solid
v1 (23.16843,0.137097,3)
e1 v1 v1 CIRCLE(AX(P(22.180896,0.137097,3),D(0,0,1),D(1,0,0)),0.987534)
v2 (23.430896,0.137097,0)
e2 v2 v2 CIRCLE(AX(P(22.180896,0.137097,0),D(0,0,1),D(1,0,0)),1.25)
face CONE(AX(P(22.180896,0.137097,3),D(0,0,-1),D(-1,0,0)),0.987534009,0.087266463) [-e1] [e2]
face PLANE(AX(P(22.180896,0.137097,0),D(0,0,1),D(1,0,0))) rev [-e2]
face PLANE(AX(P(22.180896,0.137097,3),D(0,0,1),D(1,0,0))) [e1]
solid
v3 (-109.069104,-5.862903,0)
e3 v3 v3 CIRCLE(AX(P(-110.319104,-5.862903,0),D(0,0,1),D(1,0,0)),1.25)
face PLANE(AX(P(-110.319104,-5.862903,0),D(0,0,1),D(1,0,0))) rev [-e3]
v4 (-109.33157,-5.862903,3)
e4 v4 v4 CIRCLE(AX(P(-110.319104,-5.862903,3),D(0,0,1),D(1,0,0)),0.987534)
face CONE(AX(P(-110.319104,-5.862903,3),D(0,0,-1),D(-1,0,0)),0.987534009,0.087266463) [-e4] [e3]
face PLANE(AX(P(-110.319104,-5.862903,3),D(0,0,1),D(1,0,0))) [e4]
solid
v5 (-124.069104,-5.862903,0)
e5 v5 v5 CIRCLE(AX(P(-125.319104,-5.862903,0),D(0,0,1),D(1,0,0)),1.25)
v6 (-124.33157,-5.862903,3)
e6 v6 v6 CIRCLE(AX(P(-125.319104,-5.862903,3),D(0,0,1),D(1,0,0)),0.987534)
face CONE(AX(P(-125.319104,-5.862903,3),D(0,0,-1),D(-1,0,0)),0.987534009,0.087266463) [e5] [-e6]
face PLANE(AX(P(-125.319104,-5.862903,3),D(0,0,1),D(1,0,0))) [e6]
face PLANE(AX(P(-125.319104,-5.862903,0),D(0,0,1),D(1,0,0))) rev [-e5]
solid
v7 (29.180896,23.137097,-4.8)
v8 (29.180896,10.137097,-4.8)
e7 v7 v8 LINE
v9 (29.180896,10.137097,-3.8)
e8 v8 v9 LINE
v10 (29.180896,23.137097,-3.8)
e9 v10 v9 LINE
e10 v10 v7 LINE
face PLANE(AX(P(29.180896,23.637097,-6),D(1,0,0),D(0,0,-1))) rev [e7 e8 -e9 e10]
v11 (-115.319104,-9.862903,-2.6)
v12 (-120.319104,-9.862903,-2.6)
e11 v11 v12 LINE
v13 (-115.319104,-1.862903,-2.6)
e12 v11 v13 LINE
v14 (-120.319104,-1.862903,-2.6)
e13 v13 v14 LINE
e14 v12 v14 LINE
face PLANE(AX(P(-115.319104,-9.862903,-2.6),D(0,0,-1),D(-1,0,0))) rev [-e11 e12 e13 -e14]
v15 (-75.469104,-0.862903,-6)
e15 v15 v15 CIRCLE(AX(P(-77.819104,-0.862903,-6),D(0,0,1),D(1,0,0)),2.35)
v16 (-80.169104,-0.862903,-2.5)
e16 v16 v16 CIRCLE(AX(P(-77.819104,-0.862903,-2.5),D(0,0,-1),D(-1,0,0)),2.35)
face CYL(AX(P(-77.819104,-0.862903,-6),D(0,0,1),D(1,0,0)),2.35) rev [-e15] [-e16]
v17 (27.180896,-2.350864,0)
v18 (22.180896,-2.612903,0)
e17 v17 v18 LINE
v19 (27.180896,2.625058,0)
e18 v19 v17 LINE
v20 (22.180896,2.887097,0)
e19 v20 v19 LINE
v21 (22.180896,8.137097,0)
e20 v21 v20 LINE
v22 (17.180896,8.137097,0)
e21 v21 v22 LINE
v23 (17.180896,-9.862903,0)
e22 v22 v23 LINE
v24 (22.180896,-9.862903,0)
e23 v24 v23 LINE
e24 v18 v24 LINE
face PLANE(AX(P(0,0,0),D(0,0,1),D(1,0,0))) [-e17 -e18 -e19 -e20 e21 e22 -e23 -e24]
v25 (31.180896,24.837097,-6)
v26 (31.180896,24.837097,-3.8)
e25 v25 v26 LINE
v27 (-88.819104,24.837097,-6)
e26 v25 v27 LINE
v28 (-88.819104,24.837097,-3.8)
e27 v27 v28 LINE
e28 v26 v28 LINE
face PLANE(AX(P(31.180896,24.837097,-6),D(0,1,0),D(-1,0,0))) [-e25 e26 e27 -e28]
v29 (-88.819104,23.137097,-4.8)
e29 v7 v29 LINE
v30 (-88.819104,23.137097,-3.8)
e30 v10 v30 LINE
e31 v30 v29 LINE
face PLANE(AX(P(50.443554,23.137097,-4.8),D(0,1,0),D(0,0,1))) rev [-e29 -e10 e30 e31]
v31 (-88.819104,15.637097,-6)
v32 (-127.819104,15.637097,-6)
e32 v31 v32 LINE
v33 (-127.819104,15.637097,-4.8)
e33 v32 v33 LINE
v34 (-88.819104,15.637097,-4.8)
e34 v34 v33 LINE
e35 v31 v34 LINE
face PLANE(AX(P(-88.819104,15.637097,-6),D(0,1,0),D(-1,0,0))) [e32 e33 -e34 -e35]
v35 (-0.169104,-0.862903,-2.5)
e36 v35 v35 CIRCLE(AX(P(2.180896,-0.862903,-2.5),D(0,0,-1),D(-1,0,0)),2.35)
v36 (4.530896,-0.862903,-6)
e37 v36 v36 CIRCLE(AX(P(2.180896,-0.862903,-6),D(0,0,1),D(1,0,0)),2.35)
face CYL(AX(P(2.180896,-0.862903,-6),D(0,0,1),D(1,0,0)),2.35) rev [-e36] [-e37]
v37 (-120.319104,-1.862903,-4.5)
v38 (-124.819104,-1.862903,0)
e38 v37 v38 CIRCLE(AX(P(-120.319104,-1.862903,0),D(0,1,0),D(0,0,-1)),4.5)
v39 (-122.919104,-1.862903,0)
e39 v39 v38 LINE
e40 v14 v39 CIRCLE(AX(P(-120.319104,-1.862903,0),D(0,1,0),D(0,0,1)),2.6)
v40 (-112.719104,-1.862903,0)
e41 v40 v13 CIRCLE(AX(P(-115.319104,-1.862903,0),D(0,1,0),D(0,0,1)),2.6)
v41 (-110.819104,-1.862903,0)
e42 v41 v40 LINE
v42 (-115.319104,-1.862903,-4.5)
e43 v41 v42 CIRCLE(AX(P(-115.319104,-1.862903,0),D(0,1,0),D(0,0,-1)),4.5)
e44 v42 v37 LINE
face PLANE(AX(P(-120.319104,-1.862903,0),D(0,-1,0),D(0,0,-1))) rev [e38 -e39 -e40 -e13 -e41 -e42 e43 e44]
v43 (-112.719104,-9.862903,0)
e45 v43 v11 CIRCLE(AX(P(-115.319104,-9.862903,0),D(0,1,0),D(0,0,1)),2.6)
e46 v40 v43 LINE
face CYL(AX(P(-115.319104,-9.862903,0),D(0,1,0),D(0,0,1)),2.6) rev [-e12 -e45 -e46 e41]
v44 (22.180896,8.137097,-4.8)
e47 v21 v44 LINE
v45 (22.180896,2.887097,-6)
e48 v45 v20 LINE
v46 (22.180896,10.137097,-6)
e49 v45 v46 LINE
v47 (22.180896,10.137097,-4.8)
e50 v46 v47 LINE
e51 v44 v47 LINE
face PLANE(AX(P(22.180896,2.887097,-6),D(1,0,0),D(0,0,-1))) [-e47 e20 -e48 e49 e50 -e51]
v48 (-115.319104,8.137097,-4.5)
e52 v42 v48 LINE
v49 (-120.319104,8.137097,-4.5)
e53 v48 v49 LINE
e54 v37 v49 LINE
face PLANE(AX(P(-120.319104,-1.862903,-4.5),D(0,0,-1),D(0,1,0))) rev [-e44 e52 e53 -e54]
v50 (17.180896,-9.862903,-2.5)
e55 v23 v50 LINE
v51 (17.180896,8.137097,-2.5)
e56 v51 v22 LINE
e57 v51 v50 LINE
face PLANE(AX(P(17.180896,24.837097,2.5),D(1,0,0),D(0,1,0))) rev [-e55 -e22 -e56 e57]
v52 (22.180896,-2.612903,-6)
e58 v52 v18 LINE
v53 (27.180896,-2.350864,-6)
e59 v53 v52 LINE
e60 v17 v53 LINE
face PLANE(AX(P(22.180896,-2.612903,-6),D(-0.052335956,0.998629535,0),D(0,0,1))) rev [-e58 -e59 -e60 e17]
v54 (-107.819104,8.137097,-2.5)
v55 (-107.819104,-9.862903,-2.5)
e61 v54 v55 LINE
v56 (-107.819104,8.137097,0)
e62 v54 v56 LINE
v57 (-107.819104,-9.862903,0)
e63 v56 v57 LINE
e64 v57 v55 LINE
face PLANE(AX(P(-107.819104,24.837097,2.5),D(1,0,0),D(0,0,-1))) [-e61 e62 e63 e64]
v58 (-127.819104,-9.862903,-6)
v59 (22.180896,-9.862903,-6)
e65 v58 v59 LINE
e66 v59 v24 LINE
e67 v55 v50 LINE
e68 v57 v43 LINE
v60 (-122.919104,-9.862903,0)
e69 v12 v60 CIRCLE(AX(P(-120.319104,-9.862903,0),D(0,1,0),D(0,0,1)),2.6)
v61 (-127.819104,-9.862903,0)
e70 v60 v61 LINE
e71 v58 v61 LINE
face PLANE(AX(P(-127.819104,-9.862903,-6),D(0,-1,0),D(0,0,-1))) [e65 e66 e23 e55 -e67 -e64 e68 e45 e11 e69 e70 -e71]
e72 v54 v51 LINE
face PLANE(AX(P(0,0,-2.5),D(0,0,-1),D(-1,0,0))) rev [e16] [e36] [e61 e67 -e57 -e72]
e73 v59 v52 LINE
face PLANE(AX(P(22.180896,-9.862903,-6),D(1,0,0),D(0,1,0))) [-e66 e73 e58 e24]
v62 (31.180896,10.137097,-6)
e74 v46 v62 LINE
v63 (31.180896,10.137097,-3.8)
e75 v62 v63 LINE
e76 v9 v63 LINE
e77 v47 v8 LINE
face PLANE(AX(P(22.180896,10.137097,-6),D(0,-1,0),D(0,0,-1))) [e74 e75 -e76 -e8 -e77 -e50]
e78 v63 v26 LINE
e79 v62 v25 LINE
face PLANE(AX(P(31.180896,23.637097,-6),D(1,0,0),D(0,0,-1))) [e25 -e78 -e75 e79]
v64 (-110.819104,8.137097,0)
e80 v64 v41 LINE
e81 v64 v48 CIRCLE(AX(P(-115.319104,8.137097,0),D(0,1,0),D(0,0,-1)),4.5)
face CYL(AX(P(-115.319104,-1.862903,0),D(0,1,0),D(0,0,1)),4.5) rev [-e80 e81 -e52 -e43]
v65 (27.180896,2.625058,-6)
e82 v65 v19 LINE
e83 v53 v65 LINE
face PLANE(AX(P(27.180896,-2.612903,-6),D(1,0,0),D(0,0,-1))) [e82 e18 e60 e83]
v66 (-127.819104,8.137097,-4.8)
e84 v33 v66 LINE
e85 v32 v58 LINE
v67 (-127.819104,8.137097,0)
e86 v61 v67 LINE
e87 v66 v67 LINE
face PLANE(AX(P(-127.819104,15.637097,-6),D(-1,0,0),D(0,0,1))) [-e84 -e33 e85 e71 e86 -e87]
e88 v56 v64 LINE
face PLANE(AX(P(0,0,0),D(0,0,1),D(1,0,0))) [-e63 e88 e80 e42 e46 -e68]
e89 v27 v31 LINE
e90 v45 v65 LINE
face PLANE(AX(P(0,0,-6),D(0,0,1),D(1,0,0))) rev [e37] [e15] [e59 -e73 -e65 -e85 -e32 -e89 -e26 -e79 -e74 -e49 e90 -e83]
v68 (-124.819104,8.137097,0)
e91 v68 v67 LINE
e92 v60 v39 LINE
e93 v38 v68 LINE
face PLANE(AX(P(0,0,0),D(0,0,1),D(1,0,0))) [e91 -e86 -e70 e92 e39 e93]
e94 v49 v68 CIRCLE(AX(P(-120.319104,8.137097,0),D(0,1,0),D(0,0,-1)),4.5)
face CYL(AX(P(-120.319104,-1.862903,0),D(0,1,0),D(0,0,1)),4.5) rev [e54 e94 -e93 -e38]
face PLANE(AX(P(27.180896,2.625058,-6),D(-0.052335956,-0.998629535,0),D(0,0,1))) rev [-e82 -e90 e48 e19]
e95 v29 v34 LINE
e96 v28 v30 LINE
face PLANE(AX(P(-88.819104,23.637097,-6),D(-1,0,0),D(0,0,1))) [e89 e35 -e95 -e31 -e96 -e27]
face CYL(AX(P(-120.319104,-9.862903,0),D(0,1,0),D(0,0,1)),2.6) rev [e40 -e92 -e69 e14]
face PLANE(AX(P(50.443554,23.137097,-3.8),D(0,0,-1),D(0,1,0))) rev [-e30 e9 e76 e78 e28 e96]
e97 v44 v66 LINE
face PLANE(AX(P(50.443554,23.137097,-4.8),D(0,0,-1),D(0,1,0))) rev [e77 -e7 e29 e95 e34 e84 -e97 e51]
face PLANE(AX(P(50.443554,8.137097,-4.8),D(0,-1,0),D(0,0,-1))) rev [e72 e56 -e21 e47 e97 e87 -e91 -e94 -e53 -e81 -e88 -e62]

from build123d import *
from OCP.BRepFilletAPI import BRepFilletAPI_MakeChamfer

# Parameters (mm, degrees)
BOSS_EXTRUDE1_DEPTH      = 6
BOSS_EXTRUDE1_DEPTH_BACK = 6
CUT_EXTRUDE1_DEPTH       = 157
CUT_EXTRUDE4_DEPTH       = 2.5
CUT_EXTRUDE4_DEPTH_BACK  = 2.5
SKETCH8_W                = 125
SKETCH8_H                = 34.7
CUT_EXTRUDE5_DEPTH       = 131.348014108
CUT_EXTRUDE5_DEPTH_BACK  = 131.348014108
SKETCH9_R                = 2.35
CHAMFER2_SIZE            = 5
CHAMFER2_SIZE_2          = 0.262038896
CUT_EXTRUDE8_DEPTH       = 10
CUT_EXTRUDE9_DEPTH       = 131.715773363
SKETCH16_W               = 214.344642296
SKETCH16_H               = 84.645654919
CUT_EXTRUDE10_DEPTH      = 131.348014108
SKETCH17_W               = 2
SKETCH17_H               = 14.7
CUT_EXTRUDE11_DEPTH      = 3.8
SKETCH19_R               = 1.25
BOSS_EXTRUDE5_DEPTH      = 3
BOSS_EXTRUDE5_2_DEPTH    = 3
BOSS_EXTRUDE5_3_DEPTH    = 3
CHAMFER3_SIZE            = 3
CHAMFER3_SIZE_2          = 0.262465991
CHAMFER4_SIZE            = 3
CHAMFER4_SIZE_2          = 0.262465991
CHAMFER5_SIZE            = 3
CHAMFER5_SIZE_2          = 0.262465991


# Some blends are built 0.0001 mm under size
with BuildPart() as part:
    # Sketch1 → Boss-Extrude1 (new, two sides: drawn at the far end of the back side and taken through both)
    with BuildSketch(Plane.XY.offset(-BOSS_EXTRUDE1_DEPTH_BACK)):
        Polygon((-127.819104229, -9.862903226), (22.180895771, -9.862903226), (22.180895771, -2.612903226), (27.180895771, -2.612903226), (27.180895771, 2.887096774), (22.180895771, 2.887096774), (22.180895771, 10.137096774), (31.180895771, 10.137096774), (31.180895771, 23.637096774), (31.180895771, 24.837096774), (-88.819104229, 24.837096774), (-88.819104229, 23.637096774), (-88.819104229, 15.637096774), (-127.819104229, 15.637096774), align=None)
    extrude(amount=BOSS_EXTRUDE1_DEPTH + BOSS_EXTRUDE1_DEPTH_BACK)

    # Sketch2 → Cut-Extrude1 (cut)
    with BuildSketch(Plane.ZY.offset(127.819104229)):
        Polygon((-4.8, 23.137096774), (-4.8, 8.137096774), (4.8, 8.137096774), (4.8, 23.137096774), (3.8, 23.137096774), (3.8, 24.837096774), (-3.8, 24.837096774), (-3.8, 23.137096774), align=None)
    extrude(amount=-CUT_EXTRUDE1_DEPTH, mode=Mode.SUBTRACT)

    # Sketch8 → Cut-Extrude4 (cut, two sides: drawn at the far end of the back side and taken through both)
    with BuildSketch(Plane.XY.offset(-CUT_EXTRUDE4_DEPTH_BACK)):
        with Locations((-45.319104229, 7.487096774)):
            Rectangle(SKETCH8_W, SKETCH8_H)
    extrude(amount=CUT_EXTRUDE4_DEPTH + CUT_EXTRUDE4_DEPTH_BACK, mode=Mode.SUBTRACT)

    # Sketch9 → Cut-Extrude5 (cut, two sides: drawn at the far end of the back side and taken through both)
    with BuildSketch(Plane.XY.offset(-CUT_EXTRUDE5_DEPTH_BACK)):
        with Locations((-77.819104229, -0.862903226)):
            Circle(SKETCH9_R)
        with Locations((2.180895771, -0.862903226)):
            Circle(SKETCH9_R)
    extrude(amount=CUT_EXTRUDE5_DEPTH + CUT_EXTRUDE5_DEPTH_BACK, mode=Mode.SUBTRACT)

    # Chamfer2
    chamfer2_edges_1 = [part.edges().sort_by_distance(p)[0] for p in [
        (27.180895771, -2.612903226, 0),
    ]]
    chamfer2_side_1 = [part.faces().sort_by_distance(p)[0] for p in [
        (27.175654993, -2.612903226, 0),
    ]]
    chamfer2_edges_2 = [part.edges().sort_by_distance(p)[0] for p in [
        (27.180895771, 2.887096774, 0),
    ]]
    chamfer2_side_2 = [part.faces().sort_by_distance(p)[0] for p in [
        (27.180895771, 2.881855996, 0),
    ]]
    chamfer2 = BRepFilletAPI_MakeChamfer(part.part.solid().wrapped)
    for e in chamfer2_edges_1:
        chamfer2.Add(CHAMFER2_SIZE - 0.0001, CHAMFER2_SIZE_2 - 0.0001, e.wrapped, chamfer2_side_1[0].wrapped)
    for e in chamfer2_edges_2:
        chamfer2.Add(CHAMFER2_SIZE_2 - 0.0001, CHAMFER2_SIZE - 0.0001, e.wrapped, chamfer2_side_2[0].wrapped)
    add(Compound.cast(chamfer2.Shape()), mode=Mode.REPLACE)  # a hair under: the kernel refuses the full size

    # Sketch14 → Cut-Extrude8 (cut)
    with BuildSketch(Plane(origin=(0, 8.137096774, 0), x_dir=(1, 0, 0), z_dir=(0, 1, 0))):
        with BuildLine():
            Line((-120.319104229, 4.5), (-115.319104229, 4.5))
            ThreePointArc((-115.319104229, 4.5), (-110.819104229, 0), (-115.319104229, -4.5))
            Line((-115.319104229, -4.5), (-120.319104229, -4.5))
            ThreePointArc((-120.319104229, -4.5), (-124.819104229, 0), (-120.319104229, 4.5))
        make_face()
    extrude(amount=-CUT_EXTRUDE8_DEPTH, mode=Mode.SUBTRACT)

    # Sketch15 → Cut-Extrude9 (cut, through all)
    with BuildSketch(Plane(origin=(0, -1.862903226, 0), x_dir=(1, 0, 0), z_dir=(0, 1, 0))):
        with BuildLine():
            Line((-120.319104229, -2.6), (-115.319104229, -2.6))
            ThreePointArc((-115.319104229, -2.6), (-112.719104229, 0), (-115.319104229, 2.6))
            Line((-115.319104229, 2.6), (-120.319104229, 2.6))
            ThreePointArc((-120.319104229, 2.6), (-122.919104229, 0), (-120.319104229, -2.6))
        make_face()
    extrude(amount=-CUT_EXTRUDE9_DEPTH, mode=Mode.SUBTRACT)

    # Sketch16 → Cut-Extrude10 (cut, through all)
    with BuildSketch(Plane.XY):
        with Locations((-30.272765953, 16.776086779)):
            Rectangle(SKETCH16_W, SKETCH16_H)
    extrude(amount=CUT_EXTRUDE10_DEPTH, mode=Mode.SUBTRACT)

    # Sketch17 → Cut-Extrude11 (cut)
    with BuildSketch(Plane.XY):
        with Locations((30.180895771, 17.487096774)):
            Rectangle(SKETCH17_W, SKETCH17_H)
    extrude(amount=-CUT_EXTRUDE11_DEPTH, mode=Mode.SUBTRACT)


with BuildPart() as body_2:
    # Sketch19 → Boss-Extrude5 (new body)
    with BuildSketch(Plane.XY):
        with Locations((-125.319104229, -5.862903226)):
            Circle(SKETCH19_R)
    extrude(amount=BOSS_EXTRUDE5_DEPTH)

    # Chamfer5
    # the kernel refuses this chamfer: 3, 0.262465991 mm, written as the material it takes off along each edge
    with BuildSketch(Plane(origin=(-125.319104229, -5.862903226, 3), x_dir=(1, 0, 0), z_dir=(0, -1, 0))) as chamfer5_piece_1:
        Polygon((1.25, -CHAMFER5_SIZE), (1.25 - CHAMFER5_SIZE_2 * 0.999999998391, 0), (1.25, 0), align=None)
    revolve(axis=Axis((-125.319104229, -5.862903226, 3), (0, 0, 1)), mode=Mode.SUBTRACT)


with BuildPart() as body_3:
    # Sketch19 → Boss-Extrude5 2 (new body)
    with BuildSketch(Plane.XY):
        with Locations((-110.319104229, -5.862903226)):
            Circle(SKETCH19_R)
    extrude(amount=BOSS_EXTRUDE5_2_DEPTH)

    # Chamfer4
    # the kernel refuses this chamfer: 3, 0.262465991 mm, written as the material it takes off along each edge
    with BuildSketch(Plane(origin=(-110.319104229, -5.862903226, 3), x_dir=(1, 0, 0), z_dir=(0, -1, 0))) as chamfer4_piece_1:
        Polygon((1.25, -CHAMFER4_SIZE), (1.25 - CHAMFER4_SIZE_2 * 0.999999998391, 0), (1.25, 0), align=None)
    revolve(axis=Axis((-110.319104229, -5.862903226, 3), (0, 0, 1)), mode=Mode.SUBTRACT)


with BuildPart() as body_4:
    # Sketch19 → Boss-Extrude5 3 (new body)
    with BuildSketch(Plane.XY):
        with Locations((22.180895771, 0.137096774)):
            Circle(SKETCH19_R)
    extrude(amount=BOSS_EXTRUDE5_3_DEPTH)

    # Chamfer3
    # the kernel refuses this chamfer: 3, 0.262465991 mm, written as the material it takes off along each edge
    with BuildSketch(Plane(origin=(22.180895771, 0.137096774, 3), x_dir=(1, 0, 0), z_dir=(0, -1, 0))) as chamfer3_piece_1:
        Polygon((1.25, -CHAMFER3_SIZE), (1.25 - CHAMFER3_SIZE_2 * 0.999999998391, 0), (1.25, 0), align=None)
    revolve(axis=Axis((22.180895771, 0.137096774, 3), (0, 0, 1)), mode=Mode.SUBTRACT)


solid = Compound([part.part, body_2.part, body_3.part, body_4.part])
